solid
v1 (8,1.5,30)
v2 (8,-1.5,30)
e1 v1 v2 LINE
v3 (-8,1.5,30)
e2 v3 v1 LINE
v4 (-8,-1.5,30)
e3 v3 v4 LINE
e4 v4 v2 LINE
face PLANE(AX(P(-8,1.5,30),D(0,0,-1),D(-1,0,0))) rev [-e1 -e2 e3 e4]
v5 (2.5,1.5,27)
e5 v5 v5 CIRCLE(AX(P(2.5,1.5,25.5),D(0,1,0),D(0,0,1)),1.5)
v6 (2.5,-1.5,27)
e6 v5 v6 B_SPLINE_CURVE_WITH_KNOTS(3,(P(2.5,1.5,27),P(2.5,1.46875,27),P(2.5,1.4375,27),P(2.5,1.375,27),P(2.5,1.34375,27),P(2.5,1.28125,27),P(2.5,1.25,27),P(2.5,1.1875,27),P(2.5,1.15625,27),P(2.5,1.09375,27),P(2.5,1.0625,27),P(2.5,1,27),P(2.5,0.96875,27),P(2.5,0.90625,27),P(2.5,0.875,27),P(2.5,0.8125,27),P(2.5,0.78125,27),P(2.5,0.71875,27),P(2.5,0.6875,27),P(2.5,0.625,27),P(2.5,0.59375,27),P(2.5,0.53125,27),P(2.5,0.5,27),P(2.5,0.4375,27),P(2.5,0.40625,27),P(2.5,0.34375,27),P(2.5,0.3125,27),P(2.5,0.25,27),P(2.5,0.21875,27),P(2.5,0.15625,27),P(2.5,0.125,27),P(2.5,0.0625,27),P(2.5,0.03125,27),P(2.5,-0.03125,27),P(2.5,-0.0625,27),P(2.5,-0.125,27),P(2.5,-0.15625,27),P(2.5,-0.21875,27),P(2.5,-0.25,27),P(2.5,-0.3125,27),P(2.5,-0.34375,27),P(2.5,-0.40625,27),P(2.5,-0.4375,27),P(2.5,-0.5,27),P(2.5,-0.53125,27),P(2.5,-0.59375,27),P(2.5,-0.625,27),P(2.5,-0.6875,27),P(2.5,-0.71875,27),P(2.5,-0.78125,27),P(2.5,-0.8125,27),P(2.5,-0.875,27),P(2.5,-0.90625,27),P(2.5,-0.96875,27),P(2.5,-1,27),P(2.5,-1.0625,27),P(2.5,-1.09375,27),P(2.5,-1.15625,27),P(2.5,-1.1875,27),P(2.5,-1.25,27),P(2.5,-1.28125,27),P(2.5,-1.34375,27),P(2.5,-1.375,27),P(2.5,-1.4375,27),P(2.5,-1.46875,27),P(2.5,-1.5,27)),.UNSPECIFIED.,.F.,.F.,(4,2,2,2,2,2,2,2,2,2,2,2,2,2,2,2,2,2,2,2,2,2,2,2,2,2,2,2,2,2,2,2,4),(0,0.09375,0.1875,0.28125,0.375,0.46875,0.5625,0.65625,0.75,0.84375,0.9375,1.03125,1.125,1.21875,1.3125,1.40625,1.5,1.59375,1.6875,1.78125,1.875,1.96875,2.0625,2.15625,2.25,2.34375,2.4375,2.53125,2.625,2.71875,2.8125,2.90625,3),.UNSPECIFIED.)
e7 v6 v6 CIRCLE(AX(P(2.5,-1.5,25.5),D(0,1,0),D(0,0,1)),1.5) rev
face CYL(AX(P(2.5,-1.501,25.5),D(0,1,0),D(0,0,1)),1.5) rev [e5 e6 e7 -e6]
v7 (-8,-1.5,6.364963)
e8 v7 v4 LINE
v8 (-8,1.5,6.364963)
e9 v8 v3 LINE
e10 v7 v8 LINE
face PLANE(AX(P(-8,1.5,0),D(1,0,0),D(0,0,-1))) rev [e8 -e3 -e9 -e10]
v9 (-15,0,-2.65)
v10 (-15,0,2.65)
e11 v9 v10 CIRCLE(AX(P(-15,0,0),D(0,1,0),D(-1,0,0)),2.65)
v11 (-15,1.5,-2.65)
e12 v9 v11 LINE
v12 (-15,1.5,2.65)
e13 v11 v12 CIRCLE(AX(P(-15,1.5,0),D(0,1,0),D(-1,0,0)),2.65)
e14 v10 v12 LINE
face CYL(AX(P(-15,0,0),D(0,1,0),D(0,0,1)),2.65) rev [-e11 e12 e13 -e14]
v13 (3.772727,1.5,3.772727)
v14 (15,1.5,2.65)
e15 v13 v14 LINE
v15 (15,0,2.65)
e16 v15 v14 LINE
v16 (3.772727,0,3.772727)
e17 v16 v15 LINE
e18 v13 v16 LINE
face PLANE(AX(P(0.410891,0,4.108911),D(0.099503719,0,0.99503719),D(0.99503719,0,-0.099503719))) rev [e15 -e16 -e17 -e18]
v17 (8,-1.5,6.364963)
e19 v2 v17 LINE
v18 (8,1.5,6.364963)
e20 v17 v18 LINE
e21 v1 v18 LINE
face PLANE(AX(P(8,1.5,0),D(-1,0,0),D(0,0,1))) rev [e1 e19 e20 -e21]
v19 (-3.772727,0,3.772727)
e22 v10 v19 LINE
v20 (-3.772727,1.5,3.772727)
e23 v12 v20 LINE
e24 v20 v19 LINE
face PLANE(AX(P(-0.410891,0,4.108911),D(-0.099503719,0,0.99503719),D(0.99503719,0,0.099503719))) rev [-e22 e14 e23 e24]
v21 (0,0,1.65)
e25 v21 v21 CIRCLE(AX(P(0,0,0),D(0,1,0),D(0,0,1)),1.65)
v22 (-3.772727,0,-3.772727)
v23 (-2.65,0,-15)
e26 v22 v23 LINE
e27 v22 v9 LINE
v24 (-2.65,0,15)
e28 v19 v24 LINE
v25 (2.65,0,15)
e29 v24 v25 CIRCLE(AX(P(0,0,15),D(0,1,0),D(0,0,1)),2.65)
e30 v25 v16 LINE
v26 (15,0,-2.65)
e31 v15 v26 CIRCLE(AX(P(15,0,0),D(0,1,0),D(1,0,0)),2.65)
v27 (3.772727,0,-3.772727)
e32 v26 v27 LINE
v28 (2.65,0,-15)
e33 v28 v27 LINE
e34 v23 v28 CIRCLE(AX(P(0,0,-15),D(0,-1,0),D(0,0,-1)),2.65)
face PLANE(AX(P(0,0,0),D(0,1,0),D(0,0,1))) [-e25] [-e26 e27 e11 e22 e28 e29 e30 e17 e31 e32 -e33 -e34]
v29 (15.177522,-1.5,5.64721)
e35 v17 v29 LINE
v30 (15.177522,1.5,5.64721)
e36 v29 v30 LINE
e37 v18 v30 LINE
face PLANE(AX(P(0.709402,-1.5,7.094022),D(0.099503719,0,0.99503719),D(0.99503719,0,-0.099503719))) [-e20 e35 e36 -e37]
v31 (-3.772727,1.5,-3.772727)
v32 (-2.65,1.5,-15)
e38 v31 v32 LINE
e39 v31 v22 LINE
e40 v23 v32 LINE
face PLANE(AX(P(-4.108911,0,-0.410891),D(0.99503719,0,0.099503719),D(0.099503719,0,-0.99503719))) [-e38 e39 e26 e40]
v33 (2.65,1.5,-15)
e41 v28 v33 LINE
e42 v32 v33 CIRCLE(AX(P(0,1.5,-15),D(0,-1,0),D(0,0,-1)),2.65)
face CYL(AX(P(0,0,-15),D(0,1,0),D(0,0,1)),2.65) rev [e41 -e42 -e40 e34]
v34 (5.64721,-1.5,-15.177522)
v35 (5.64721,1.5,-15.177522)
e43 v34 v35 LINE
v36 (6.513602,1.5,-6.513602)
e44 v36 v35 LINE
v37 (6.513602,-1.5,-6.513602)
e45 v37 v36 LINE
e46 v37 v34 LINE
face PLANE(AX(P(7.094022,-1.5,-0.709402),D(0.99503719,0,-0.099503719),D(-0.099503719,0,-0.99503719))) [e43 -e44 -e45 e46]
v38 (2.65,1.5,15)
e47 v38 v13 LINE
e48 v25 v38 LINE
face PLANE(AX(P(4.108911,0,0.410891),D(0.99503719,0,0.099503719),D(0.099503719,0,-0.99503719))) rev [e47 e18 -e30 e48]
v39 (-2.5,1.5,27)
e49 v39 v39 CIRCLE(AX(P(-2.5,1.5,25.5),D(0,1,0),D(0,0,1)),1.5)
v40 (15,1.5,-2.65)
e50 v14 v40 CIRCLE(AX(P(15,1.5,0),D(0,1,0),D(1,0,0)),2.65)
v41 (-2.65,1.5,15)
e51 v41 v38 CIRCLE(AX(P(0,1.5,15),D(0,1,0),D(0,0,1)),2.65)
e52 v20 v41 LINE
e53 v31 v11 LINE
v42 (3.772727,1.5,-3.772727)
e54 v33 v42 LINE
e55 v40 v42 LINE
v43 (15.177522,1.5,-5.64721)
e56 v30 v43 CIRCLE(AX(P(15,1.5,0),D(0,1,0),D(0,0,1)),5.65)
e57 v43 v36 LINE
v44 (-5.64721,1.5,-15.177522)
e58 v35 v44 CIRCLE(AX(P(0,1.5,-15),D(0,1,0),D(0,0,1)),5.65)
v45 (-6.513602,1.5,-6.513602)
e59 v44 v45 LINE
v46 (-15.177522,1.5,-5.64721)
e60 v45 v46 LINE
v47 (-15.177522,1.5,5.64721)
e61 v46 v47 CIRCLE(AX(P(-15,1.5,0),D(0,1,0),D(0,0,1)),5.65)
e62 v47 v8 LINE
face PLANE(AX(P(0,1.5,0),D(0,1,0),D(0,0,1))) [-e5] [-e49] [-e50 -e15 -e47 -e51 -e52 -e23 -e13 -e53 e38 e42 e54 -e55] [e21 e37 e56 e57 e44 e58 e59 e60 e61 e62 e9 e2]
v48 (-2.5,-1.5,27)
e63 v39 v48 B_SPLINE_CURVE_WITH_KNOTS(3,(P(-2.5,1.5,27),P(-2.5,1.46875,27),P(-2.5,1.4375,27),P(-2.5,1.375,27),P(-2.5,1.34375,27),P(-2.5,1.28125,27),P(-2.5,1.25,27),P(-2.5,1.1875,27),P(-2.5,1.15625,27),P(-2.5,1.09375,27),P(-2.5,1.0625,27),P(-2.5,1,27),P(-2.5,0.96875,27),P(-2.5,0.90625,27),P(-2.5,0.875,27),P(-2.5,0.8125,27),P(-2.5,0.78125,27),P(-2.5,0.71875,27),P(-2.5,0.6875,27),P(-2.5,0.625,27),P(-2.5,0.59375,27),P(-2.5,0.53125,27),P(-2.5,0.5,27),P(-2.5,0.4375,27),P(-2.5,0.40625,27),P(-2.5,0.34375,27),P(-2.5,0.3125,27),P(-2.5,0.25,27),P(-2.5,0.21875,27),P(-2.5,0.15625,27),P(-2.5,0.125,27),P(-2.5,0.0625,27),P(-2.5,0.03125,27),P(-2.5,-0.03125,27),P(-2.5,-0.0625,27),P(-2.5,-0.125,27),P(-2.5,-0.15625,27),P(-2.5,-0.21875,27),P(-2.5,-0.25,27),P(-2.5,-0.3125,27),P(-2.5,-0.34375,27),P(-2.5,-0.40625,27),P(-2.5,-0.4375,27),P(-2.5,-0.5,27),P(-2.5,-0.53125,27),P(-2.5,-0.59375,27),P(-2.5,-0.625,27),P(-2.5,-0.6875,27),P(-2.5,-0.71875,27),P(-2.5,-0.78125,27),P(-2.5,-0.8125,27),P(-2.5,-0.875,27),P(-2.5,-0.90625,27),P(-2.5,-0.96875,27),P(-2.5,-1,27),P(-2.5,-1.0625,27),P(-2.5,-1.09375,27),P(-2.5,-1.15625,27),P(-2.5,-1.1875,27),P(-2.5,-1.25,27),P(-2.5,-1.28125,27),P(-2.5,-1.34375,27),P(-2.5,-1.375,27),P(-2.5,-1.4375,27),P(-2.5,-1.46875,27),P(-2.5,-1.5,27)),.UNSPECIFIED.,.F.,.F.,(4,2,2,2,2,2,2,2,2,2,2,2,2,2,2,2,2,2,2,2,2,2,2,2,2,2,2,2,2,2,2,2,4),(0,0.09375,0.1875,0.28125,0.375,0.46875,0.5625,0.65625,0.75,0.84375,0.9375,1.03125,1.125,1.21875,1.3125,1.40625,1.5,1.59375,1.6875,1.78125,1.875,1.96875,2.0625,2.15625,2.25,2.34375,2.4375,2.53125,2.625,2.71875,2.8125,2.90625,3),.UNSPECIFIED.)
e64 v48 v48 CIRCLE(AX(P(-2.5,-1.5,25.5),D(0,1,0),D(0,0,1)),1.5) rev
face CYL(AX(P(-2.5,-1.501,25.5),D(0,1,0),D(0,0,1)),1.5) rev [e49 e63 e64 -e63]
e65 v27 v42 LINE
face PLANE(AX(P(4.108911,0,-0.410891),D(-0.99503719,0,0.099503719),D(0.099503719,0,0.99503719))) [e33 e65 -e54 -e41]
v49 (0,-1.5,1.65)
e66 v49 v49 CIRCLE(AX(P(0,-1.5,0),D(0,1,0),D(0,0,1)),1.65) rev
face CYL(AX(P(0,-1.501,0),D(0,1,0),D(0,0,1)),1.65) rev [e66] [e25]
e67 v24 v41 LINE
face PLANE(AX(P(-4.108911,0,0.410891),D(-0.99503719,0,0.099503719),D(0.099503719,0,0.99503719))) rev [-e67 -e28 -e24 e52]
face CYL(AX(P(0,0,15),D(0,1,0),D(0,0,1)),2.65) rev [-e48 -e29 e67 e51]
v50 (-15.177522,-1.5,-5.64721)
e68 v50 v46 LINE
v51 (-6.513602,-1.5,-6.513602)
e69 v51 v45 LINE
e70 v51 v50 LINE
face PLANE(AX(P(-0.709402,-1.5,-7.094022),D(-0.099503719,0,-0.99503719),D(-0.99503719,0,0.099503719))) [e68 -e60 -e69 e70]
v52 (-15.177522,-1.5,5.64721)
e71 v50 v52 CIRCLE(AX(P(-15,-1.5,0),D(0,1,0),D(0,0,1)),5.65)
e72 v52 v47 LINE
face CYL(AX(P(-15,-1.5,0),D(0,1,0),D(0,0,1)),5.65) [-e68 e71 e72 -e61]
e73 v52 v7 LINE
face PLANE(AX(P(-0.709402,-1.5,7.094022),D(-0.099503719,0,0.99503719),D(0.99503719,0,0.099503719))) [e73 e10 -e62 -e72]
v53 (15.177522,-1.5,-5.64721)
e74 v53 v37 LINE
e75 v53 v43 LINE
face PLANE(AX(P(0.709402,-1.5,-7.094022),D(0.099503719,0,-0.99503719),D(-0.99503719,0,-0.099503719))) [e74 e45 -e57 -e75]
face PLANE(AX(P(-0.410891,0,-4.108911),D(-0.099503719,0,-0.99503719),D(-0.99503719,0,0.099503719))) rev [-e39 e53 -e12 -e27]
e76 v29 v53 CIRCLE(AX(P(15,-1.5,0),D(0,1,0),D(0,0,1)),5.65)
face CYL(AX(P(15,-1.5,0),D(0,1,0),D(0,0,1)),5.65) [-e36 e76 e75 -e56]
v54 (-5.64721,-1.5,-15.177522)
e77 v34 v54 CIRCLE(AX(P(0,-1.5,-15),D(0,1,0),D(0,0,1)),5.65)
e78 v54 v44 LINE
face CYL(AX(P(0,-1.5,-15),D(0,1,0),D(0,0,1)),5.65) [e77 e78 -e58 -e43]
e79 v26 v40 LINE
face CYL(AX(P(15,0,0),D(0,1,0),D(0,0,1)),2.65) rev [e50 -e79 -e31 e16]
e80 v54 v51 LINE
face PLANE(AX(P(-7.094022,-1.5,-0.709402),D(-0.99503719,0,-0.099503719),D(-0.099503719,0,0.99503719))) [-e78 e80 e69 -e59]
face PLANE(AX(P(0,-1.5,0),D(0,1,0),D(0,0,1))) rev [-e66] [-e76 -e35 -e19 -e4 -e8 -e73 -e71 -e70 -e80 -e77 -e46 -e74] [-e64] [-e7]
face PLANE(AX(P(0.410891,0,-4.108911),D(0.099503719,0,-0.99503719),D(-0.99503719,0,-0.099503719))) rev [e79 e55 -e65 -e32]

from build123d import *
from build123d.topology import SkipClean

# Parameters (mm, degrees)
SKETCH1_R               = 21
BOSS_EXTRUDE1_DEPTH     = 1.5
SKETCH2_R               = 2.65
CUT_EXTRUDE1_DEPTH      = 1.5
SKETCH5_W               = 16
SKETCH5_H               = 30
BOSS_EXTRUDE2_DEPTH     = 1.5
CIRPATTERN1_DEPTH       = 1.5
CUT_EXTRUDE4_REACH      = 38.65
SKETCH4_R               = 1.65
CUT_EXTRUDE5_REACH      = 38.742
SKETCH6_R               = 1.5
CUT_EXTRUDE6_DEPTH      = 37.650375169
CUT_EXTRUDE6_DEPTH_BACK = 37.650375169


# Read off the part's stored shape, not the designer's step: CirPattern1
with BuildPart() as part:
    # Sketch1 → Boss-Extrude1 (new, symmetric)
    with BuildSketch(Plane(origin=(0, 0, 0), x_dir=(1, 0, 0), z_dir=(0, 1, 0))):
        with Locations(Location((0, 0, 0), (0, 0, 270))):
            Circle(SKETCH1_R)
    extrude(amount=BOSS_EXTRUDE1_DEPTH, both=True)

    # Sketch2 → Cut-Extrude1 (cut)
    with BuildSketch(Plane(origin=(0, 1.5, 0), x_dir=(1, 0, 0), z_dir=(0, 1, 0))):
        with Locations((0, -15)):
            Circle(SKETCH2_R)
        with BuildLine():
            ThreePointArc((-2.65, -15), (0, -12.35), (2.65, -15))
            Line((2.65, -15), (4.067821782, -0.821782178))
            ThreePointArc((4.067821782, -0.821782178), (0, -4.15), (-4.067821782, -0.821782178))
            Line((-4.067821782, -0.821782178), (-2.65, -15))
        make_face()
        with BuildLine():
            ThreePointArc((-4.067821782, -0.821782178), (0, -4.15), (4.067821782, -0.821782178))
            Line((4.067821782, -0.821782178), (4.15, 0))
            ThreePointArc((4.15, 0), (0, 4.15), (-4.15, 0))
            Line((-4.15, 0), (-4.067821782, -0.821782178))
        make_face()
    cut_extrude1 = extrude(amount=-CUT_EXTRUDE1_DEPTH, mode=Mode.SUBTRACT)

    # Sketch5 → Boss-Extrude2 (add, symmetric)
    with BuildSketch(Plane(origin=(0, 0, 0), x_dir=(1, 0, 0), z_dir=(0, 1, 0))):
        with Locations((0, -15)):
            Rectangle(SKETCH5_W, SKETCH5_H)
    extrude(amount=BOSS_EXTRUDE2_DEPTH, both=True)

    # Mirror1: Cut-Extrude1 across plane
    with SkipClean():  # the faces are left unmerged after this step: merging them gives an invalid solid
        add(cut_extrude1.mirror(Plane.XY), mode=Mode.SUBTRACT)

    # CirPattern1 outline → CirPattern1 (cut)
    with BuildSketch(Plane(origin=(0, 0, 0), x_dir=(1, 0, 0), z_dir=(0, 1, 0))):
        with BuildLine():
            Line((3.772727273, -3.772727273), (15, -2.65))
            ThreePointArc((15, -2.65), (17.65, 0), (15, 2.65))
            Line((15, 2.65), (3.772727273, 3.772727273))
            Line((3.772727273, 3.772727273), (4.067821782, 0.821782178))
            ThreePointArc((4.067821782, 0.821782178), (0, -4.15), (-4.067821782, 0.821782178))
            Line((-4.067821782, 0.821782178), (-3.772727273, 3.772727273))
            Line((-3.772727273, 3.772727273), (-15, 2.65))
            ThreePointArc((-15, 2.65), (-17.65, 0), (-15, -2.65))
            Line((-15, -2.65), (-3.772727273, -3.772727273))
            Line((-3.772727273, -3.772727273), (-2.65, -15))
            ThreePointArc((-2.65, -15), (0, -17.65), (2.65, -15))
            Line((2.65, -15), (3.772727273, -3.772727273))
        make_face()
    extrude(amount=CIRPATTERN1_DEPTH, mode=Mode.SUBTRACT)

    # Sketch4 → Cut-Extrude4 (cut, up to next)
    with BuildSketch(Plane(origin=(0, 0, 0), x_dir=(1, 0, 0), z_dir=(0, 1, 0)), mode=Mode.PRIVATE) as cut_extrude4_sk1:
        with Locations(Location((0, 0, 0), (0, 0, 270))):
            Circle(SKETCH4_R)
    cut_extrude4_tool1 = extrude(cut_extrude4_sk1.sketch, amount=-CUT_EXTRUDE4_REACH, mode=Mode.PRIVATE) & part.part
    add(cut_extrude4_tool1.solids().sort_by_distance((0, 0, 0))[0], mode=Mode.SUBTRACT)

    # Sketch6 → Cut-Extrude5 (cut, up to next)
    with BuildSketch(Plane(origin=(0, 1.5, 0), x_dir=(1, 0, 0), z_dir=(0, 1, 0)), mode=Mode.PRIVATE) as cut_extrude5_sk1:
        with Locations(Location((2.5, -25.5, 0), (0, 0, 270))):
            Circle(SKETCH6_R)
    cut_extrude5_tool1 = extrude(cut_extrude5_sk1.sketch, amount=-CUT_EXTRUDE5_REACH, mode=Mode.PRIVATE) & part.part
    # Sketch6 → Cut-Extrude5 (cut, up to next)
    with BuildSketch(Plane(origin=(0, 1.5, 0), x_dir=(1, 0, 0), z_dir=(0, 1, 0)), mode=Mode.PRIVATE) as cut_extrude5_sk2:
        with Locations(Location((-2.5, -25.5, 0), (0, 0, 270))):
            Circle(SKETCH6_R)
    cut_extrude5_tool2 = extrude(cut_extrude5_sk2.sketch, amount=-CUT_EXTRUDE5_REACH, mode=Mode.PRIVATE) & part.part
    add(cut_extrude5_tool1.solids().sort_by_distance((2.5, 1.5, 25.5))[0], mode=Mode.SUBTRACT)
    add(cut_extrude5_tool2.solids().sort_by_distance((-2.5, 1.5, 25.5))[0], mode=Mode.SUBTRACT)

    # Sketch7 → Cut-Extrude6 (cut, two sides: drawn at the far end of the back side and taken through both)
    with BuildSketch(Plane(origin=(0, 0, 0), x_dir=(1, 0, 0), z_dir=(0, 1, 0)).offset(-CUT_EXTRUDE6_DEPTH_BACK)):
        with BuildLine():
            ThreePointArc((8, -19.416487839), (0, 21), (-8, -19.416487839))
            Line((-8, -19.416487839), (-8, -6.364962686))
            Line((-8, -6.364962686), (-15.177522436, -5.647210443))
            ThreePointArc((-15.177522436, -5.647210443), (-20.65, 0), (-15.177522436, 5.647210443))
            Line((-15.177522436, 5.647210443), (-6.513602442, 6.513602442))
            Line((-6.513602442, 6.513602442), (-5.647210443, 15.177522436))
            ThreePointArc((-5.647210443, 15.177522436), (0, 20.65), (5.647210443, 15.177522436))
            Line((5.647210443, 15.177522436), (6.513602442, 6.513602442))
            Line((6.513602442, 6.513602442), (15.177522436, 5.647210443))
            ThreePointArc((15.177522436, 5.647210443), (20.65, 0), (15.177522436, -5.647210443))
            Line((15.177522436, -5.647210443), (8, -6.364962686))
            Line((8, -6.364962686), (8, -19.416487839))
        make_face()
    extrude(amount=CUT_EXTRUDE6_DEPTH + CUT_EXTRUDE6_DEPTH_BACK, mode=Mode.SUBTRACT)


solid = part.part
